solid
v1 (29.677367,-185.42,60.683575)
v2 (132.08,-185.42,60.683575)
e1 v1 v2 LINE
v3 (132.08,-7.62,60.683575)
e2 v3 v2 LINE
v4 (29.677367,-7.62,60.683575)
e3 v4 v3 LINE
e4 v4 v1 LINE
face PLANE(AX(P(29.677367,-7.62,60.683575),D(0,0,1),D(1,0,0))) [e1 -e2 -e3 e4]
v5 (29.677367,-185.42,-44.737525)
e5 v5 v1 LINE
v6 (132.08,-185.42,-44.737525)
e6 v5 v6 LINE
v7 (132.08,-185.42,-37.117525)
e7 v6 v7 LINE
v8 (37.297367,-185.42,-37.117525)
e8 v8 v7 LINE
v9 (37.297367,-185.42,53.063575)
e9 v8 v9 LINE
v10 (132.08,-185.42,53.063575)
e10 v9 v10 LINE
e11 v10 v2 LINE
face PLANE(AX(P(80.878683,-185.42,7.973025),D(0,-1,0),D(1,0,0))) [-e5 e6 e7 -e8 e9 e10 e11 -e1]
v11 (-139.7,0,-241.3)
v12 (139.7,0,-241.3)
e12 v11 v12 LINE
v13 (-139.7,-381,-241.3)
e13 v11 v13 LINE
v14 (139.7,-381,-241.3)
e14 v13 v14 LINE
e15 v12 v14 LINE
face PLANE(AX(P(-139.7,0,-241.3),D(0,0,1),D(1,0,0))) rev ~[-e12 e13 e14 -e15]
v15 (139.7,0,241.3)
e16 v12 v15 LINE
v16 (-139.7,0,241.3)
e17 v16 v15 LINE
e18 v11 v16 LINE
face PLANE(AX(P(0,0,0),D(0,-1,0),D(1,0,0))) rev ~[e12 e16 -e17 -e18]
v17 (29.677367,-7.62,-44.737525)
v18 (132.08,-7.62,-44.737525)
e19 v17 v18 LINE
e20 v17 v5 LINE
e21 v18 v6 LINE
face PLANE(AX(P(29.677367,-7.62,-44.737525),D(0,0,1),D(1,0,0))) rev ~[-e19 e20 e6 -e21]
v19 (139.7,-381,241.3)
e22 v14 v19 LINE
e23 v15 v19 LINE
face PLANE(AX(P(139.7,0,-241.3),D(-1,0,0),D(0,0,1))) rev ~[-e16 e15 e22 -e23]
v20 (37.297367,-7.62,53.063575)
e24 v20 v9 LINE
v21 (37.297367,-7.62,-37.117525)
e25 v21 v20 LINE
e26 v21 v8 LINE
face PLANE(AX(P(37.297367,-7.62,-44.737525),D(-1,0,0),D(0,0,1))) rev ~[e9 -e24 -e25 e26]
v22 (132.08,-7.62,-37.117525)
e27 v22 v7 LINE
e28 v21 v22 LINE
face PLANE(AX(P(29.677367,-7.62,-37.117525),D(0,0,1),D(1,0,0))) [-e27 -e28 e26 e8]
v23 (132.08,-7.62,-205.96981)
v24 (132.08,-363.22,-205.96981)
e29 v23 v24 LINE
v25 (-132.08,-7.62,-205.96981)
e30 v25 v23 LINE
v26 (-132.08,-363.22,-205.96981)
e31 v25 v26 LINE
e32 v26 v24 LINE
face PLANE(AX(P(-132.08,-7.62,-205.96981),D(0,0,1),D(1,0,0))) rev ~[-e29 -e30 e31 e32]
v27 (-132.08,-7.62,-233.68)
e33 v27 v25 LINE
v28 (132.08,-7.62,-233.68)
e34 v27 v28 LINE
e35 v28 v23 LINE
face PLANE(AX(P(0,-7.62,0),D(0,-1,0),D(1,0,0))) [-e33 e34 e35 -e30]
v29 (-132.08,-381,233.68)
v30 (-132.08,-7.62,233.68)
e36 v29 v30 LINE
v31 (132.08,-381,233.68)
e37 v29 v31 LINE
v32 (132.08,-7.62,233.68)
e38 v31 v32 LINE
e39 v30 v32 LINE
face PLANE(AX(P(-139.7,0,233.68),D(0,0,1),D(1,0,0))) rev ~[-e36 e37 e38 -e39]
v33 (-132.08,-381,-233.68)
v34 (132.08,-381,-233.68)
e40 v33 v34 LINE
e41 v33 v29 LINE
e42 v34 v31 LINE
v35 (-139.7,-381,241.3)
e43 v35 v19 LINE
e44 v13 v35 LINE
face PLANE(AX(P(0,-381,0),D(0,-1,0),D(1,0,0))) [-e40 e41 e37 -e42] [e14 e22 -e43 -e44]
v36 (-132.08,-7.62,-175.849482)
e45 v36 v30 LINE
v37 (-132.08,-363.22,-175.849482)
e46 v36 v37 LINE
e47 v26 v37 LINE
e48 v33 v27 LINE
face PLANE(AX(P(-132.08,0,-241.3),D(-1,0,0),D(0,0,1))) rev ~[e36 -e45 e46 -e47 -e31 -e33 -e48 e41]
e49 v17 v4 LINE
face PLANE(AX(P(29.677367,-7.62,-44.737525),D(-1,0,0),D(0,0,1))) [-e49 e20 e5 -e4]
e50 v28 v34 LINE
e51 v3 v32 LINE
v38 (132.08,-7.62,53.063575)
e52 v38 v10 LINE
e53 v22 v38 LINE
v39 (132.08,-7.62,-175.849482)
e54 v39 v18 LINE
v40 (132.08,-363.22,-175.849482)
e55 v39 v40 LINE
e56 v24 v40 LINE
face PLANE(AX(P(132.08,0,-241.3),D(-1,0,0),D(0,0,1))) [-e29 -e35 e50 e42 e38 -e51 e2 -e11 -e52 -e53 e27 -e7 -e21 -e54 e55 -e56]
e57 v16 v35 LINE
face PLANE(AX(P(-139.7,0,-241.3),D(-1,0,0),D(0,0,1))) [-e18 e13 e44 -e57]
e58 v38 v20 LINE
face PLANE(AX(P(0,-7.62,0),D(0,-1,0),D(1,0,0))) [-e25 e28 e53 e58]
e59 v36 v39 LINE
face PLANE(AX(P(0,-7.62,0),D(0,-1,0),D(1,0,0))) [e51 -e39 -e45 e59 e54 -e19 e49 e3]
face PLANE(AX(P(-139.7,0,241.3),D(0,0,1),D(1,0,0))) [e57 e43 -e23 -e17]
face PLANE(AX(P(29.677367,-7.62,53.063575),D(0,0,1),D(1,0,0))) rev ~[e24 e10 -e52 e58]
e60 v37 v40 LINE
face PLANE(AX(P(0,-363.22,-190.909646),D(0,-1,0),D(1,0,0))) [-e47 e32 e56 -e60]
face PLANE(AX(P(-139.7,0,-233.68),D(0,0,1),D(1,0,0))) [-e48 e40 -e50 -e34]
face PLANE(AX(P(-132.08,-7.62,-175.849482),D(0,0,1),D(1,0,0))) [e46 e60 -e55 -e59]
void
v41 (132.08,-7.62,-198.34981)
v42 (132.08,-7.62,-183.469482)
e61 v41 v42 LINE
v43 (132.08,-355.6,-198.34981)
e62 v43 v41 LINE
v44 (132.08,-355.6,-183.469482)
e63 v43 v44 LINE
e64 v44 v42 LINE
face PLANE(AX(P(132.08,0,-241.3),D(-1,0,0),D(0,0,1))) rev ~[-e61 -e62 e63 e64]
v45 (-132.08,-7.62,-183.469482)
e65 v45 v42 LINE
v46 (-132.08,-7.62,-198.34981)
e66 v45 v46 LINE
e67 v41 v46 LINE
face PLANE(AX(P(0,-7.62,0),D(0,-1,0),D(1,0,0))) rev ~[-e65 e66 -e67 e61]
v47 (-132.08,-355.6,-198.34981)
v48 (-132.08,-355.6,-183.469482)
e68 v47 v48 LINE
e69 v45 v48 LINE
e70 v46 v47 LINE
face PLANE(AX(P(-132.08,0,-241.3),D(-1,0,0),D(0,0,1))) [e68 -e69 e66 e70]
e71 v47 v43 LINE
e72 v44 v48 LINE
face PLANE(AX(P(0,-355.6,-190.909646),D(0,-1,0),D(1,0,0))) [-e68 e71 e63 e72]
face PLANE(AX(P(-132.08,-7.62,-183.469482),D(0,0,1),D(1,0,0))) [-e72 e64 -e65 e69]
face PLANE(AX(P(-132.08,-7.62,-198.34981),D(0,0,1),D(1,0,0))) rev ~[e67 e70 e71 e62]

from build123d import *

# Parameters (mm, degrees)
F0_W         = 279.4
F0_H         = 482.6
F1_DEPTH     = 381
F2_T         = -7.62
F3_W         = 264.16
F3_H         = 30.1203280687
F4_DEPTH     = 355.6
F5_W         = 102.4026331621
F5_H         = 105.4210998118
F6_DEPTH     = 177.8
F7_DEPTH     = 177.8
F8_T         = 7.62
F8_T3_DEPTH  = 388.62
F8_T5_DEPTH  = 42.9501895142
F8_T7_DEPTH  = 370.84
F8_T9_DEPTH  = 45.3603280687
F8_T11_DEPTH = 146.3519571328
F8_T13_DEPTH = 193.04
F8_T15_DEPTH = 188.2364254725
F8_T17_DEPTH = 279.4
F8_T19_DEPTH = 424.7694824171
F8_T21_DEPTH = 117.6426331621
F8_T23_DEPTH = 120.6610998118


# Not quite as in the source:
# - a shell that OpenCascade refuses in one call is made with other operations: the cavity is built on its own and cut out


with BuildPart() as f1:
    # F0 (on Front) → F1 (new body)
    with BuildSketch(Plane.XZ):
        Rectangle(F0_W, F0_H)
    extrude(amount=F1_DEPTH)

    # F2
    f2_openings = [f1.faces().sort_by_distance(p)[0] for p in [
        (0, -381, 0),
    ]]
    offset(amount=F2_T, openings=f2_openings)

    # F3 (on face) → F4 (join)
    with BuildSketch(Plane.XZ.offset(7.62)):
        with Locations((0, -190.9096464515)):
            Rectangle(F3_W, F3_H)
    extrude(amount=F4_DEPTH)

    # F5 (on face) → F6 (join)
    with BuildSketch(Plane.XZ.offset(7.62)):
        with Locations((80.8786834189, 7.9730246216)):
            Rectangle(F5_W, F5_H)
    extrude(amount=F6_DEPTH)

    # F7 (add): a face of the model
    f7_faces = [f1.faces().sort_by_distance(p)[0] for p in [
        (80.8786834189, -185.42, 7.9730246216),
    ]]
    extrude(f7_faces, amount=-F7_DEPTH)

    # F8: shell of thickness 7.62, made by hand


with BuildPart() as f8_core1:
    # F8_t2: copy of F1
    add(f1.part)

    # the walls: a layer under each face that stays
    f8_faces = [f8_core1.faces().sort_by_distance(p)[0] for p in [
        (139.7, -190.5, 0),
        (0, -190.5, -241.3),
        (0, -190.5, 241.3),
        (0, 0, 0),
        (96.04375, -381, -235.3419753086),
        (-139.7, -190.5, 0),
        (132.08, -194.31, 0),
        (0, -194.31, -233.68),
        (-132.08, -194.31, 0),
        (0, -194.31, 233.68),
        (0, -7.62, -219.8249052429),
        (0, -185.42, -205.9698104858),
        (0, -363.22, -190.9096464515),
        (0, -185.42, -175.8494824171),
        (0, -7.62, 28.9152587914),
        (80.8786834189, -96.52, -44.7375252843),
        (80.8786834189, -96.52, 60.6835745275),
        (29.6773668379, -96.52, 7.9730246216),
    ]]
    thicken(f8_faces, amount=-F8_T, mode=Mode.SUBTRACT)

    # F8_s4 → F8_t3 (cut)
    with BuildSketch(Plane.XZ):
        Polygon((132.0038, -233.6038), (139.7, -233.68), (139.7, -241.3), (132.08, -241.3), align=None)
        Polygon((132.0038, 233.6038), (139.7, 233.68), (139.7, 241.3), (132.08, 241.3), align=None)
        Polygon((-132.0038, -233.6038), (-132.08, -241.3), (-139.7, -241.3), (-139.7, -233.68), align=None)
        Polygon((-132.0038, 233.6038), (-139.7, 233.68), (-139.7, 241.3), (-132.08, 241.3), align=None)
    extrude(amount=F8_T3_DEPTH, mode=Mode.SUBTRACT)

    # F8_s6 → F8_t5 (cut)
    with BuildSketch(Plane.XY.offset(-241.3)):
        Polygon((132.0038, -7.6962), (139.7, -7.62), (139.7, 0), (132.08, 0), align=None)
        Polygon((-132.0038, -7.6962), (-139.7, -7.62), (-139.7, 0), (-132.08, 0), align=None)
    extrude(amount=F8_T5_DEPTH, mode=Mode.SUBTRACT)

    # F8_s8 → F8_t7 (cut)
    with BuildSketch(Plane.XZ):
        Polygon((132.0038, -206.0460104858), (139.7, -205.9698104858), (139.7, -198.3498104858), (132.08, -198.3498104858), align=None)
        Polygon((132.0038, -175.7732824171), (139.7, -175.8494824171), (139.7, -183.4694824171), (132.08, -183.4694824171), align=None)
        Polygon((-132.0038, -175.7732824171), (-139.7, -175.8494824171), (-139.7, -183.4694824171), (-132.08, -183.4694824171), align=None)
        Polygon((-132.0038, -206.0460104858), (-139.7, -205.9698104858), (-139.7, -198.3498104858), (-132.08, -198.3498104858), align=None)
    extrude(amount=F8_T7_DEPTH, mode=Mode.SUBTRACT)

    # F8_s10 → F8_t9 (cut)
    with BuildSketch(Plane.XY.offset(-213.5898104858)):
        Polygon((132.0038, -363.2962), (139.7, -363.22), (139.7, -355.6), (132.08, -355.6), align=None)
        Polygon((-132.0038, -363.2962), (-139.7, -363.22), (-139.7, -355.6), (-132.08, -355.6), align=None)
    extrude(amount=F8_T9_DEPTH, mode=Mode.SUBTRACT)

    # F8_s12 → F8_t11 (cut)
    with BuildSketch(Plane.XY.offset(-183.4694824171)):
        Polygon((132.0038, -7.6962), (139.7, -7.62), (139.7, 0), (132.08, 0), align=None)
    extrude(amount=F8_T11_DEPTH, mode=Mode.SUBTRACT)

    # F8_s14 → F8_t13 (cut)
    with BuildSketch(Plane.XZ):
        Polygon((132.0038, -44.8137252843), (139.7, -44.7375252843), (139.7, -37.1175252843), (132.08, -37.1175252843), align=None)
        Polygon((132.0038, 60.7597745275), (139.7, 60.6835745275), (139.7, 53.0635745275), (132.08, 53.0635745275), align=None)
    extrude(amount=F8_T13_DEPTH, mode=Mode.SUBTRACT)

    # F8_s16 → F8_t15 (cut)
    with BuildSketch(Plane.XY.offset(53.0635745275)):
        Polygon((132.0038, -7.6962), (139.7, -7.62), (139.7, 0), (132.08, 0), align=None)
    extrude(amount=F8_T15_DEPTH, mode=Mode.SUBTRACT)

    # F8_s18 → F8_t17 (cut)
    with BuildSketch(Plane.YZ.offset(-139.7)):
        Polygon((-7.6962, -233.6038), (-7.62, -241.3), (0, -241.3), (0, -233.68), align=None)
        Polygon((-7.6962, 233.6038), (-7.62, 241.3), (0, 241.3), (0, 233.68), align=None)
        Polygon((-7.6962, -206.0460104858), (0, -205.9698104858), (0, -198.3498104858), (-7.62, -198.3498104858), align=None)
        Polygon((-7.6962, -175.7732824171), (-7.62, -183.4694824171), (0, -183.4694824171), (0, -175.8494824171), align=None)
    extrude(amount=F8_T17_DEPTH, mode=Mode.SUBTRACT)

    # F8_s20 → F8_t19 (cut)
    with BuildSketch(Plane.XY.offset(-183.4694824171)):
        Polygon((-132.0038, -7.6962), (-139.7, -7.62), (-139.7, 0), (-132.08, 0), align=None)
    extrude(amount=F8_T19_DEPTH, mode=Mode.SUBTRACT)

    # F8_s22 → F8_t21 (cut)
    with BuildSketch(Plane.YZ.offset(22.0573668379)):
        Polygon((-7.6962, 60.7597745275), (0, 60.6835745275), (0, 53.0635745275), (-7.62, 53.0635745275), align=None)
        Polygon((-7.6962, -44.8137252843), (0, -44.7375252843), (0, -37.1175252843), (-7.62, -37.1175252843), align=None)
    extrude(amount=F8_T21_DEPTH, mode=Mode.SUBTRACT)

    # F8_s24 → F8_t23 (cut)
    with BuildSketch(Plane.XY.offset(-52.3575252843)):
        Polygon((29.6011668379, -7.6962), (29.6773668379, 0), (37.2973668379, 0), (37.2973668379, -7.62), align=None)
    extrude(amount=F8_T23_DEPTH, mode=Mode.SUBTRACT)


with BuildPart() as f1_1:
    add(f1.part)

    # what is left inside the walls is the cavity
    f8_cavity = [f8_core1.part.solids().sort_by_distance(p)[0] for p in [
        (84.688683, -126.153333, 52.987375),
        (0, -239.606667, -183.545682),
    ]]
    add(f8_cavity, mode=Mode.SUBTRACT)


solid = f1_1.part
